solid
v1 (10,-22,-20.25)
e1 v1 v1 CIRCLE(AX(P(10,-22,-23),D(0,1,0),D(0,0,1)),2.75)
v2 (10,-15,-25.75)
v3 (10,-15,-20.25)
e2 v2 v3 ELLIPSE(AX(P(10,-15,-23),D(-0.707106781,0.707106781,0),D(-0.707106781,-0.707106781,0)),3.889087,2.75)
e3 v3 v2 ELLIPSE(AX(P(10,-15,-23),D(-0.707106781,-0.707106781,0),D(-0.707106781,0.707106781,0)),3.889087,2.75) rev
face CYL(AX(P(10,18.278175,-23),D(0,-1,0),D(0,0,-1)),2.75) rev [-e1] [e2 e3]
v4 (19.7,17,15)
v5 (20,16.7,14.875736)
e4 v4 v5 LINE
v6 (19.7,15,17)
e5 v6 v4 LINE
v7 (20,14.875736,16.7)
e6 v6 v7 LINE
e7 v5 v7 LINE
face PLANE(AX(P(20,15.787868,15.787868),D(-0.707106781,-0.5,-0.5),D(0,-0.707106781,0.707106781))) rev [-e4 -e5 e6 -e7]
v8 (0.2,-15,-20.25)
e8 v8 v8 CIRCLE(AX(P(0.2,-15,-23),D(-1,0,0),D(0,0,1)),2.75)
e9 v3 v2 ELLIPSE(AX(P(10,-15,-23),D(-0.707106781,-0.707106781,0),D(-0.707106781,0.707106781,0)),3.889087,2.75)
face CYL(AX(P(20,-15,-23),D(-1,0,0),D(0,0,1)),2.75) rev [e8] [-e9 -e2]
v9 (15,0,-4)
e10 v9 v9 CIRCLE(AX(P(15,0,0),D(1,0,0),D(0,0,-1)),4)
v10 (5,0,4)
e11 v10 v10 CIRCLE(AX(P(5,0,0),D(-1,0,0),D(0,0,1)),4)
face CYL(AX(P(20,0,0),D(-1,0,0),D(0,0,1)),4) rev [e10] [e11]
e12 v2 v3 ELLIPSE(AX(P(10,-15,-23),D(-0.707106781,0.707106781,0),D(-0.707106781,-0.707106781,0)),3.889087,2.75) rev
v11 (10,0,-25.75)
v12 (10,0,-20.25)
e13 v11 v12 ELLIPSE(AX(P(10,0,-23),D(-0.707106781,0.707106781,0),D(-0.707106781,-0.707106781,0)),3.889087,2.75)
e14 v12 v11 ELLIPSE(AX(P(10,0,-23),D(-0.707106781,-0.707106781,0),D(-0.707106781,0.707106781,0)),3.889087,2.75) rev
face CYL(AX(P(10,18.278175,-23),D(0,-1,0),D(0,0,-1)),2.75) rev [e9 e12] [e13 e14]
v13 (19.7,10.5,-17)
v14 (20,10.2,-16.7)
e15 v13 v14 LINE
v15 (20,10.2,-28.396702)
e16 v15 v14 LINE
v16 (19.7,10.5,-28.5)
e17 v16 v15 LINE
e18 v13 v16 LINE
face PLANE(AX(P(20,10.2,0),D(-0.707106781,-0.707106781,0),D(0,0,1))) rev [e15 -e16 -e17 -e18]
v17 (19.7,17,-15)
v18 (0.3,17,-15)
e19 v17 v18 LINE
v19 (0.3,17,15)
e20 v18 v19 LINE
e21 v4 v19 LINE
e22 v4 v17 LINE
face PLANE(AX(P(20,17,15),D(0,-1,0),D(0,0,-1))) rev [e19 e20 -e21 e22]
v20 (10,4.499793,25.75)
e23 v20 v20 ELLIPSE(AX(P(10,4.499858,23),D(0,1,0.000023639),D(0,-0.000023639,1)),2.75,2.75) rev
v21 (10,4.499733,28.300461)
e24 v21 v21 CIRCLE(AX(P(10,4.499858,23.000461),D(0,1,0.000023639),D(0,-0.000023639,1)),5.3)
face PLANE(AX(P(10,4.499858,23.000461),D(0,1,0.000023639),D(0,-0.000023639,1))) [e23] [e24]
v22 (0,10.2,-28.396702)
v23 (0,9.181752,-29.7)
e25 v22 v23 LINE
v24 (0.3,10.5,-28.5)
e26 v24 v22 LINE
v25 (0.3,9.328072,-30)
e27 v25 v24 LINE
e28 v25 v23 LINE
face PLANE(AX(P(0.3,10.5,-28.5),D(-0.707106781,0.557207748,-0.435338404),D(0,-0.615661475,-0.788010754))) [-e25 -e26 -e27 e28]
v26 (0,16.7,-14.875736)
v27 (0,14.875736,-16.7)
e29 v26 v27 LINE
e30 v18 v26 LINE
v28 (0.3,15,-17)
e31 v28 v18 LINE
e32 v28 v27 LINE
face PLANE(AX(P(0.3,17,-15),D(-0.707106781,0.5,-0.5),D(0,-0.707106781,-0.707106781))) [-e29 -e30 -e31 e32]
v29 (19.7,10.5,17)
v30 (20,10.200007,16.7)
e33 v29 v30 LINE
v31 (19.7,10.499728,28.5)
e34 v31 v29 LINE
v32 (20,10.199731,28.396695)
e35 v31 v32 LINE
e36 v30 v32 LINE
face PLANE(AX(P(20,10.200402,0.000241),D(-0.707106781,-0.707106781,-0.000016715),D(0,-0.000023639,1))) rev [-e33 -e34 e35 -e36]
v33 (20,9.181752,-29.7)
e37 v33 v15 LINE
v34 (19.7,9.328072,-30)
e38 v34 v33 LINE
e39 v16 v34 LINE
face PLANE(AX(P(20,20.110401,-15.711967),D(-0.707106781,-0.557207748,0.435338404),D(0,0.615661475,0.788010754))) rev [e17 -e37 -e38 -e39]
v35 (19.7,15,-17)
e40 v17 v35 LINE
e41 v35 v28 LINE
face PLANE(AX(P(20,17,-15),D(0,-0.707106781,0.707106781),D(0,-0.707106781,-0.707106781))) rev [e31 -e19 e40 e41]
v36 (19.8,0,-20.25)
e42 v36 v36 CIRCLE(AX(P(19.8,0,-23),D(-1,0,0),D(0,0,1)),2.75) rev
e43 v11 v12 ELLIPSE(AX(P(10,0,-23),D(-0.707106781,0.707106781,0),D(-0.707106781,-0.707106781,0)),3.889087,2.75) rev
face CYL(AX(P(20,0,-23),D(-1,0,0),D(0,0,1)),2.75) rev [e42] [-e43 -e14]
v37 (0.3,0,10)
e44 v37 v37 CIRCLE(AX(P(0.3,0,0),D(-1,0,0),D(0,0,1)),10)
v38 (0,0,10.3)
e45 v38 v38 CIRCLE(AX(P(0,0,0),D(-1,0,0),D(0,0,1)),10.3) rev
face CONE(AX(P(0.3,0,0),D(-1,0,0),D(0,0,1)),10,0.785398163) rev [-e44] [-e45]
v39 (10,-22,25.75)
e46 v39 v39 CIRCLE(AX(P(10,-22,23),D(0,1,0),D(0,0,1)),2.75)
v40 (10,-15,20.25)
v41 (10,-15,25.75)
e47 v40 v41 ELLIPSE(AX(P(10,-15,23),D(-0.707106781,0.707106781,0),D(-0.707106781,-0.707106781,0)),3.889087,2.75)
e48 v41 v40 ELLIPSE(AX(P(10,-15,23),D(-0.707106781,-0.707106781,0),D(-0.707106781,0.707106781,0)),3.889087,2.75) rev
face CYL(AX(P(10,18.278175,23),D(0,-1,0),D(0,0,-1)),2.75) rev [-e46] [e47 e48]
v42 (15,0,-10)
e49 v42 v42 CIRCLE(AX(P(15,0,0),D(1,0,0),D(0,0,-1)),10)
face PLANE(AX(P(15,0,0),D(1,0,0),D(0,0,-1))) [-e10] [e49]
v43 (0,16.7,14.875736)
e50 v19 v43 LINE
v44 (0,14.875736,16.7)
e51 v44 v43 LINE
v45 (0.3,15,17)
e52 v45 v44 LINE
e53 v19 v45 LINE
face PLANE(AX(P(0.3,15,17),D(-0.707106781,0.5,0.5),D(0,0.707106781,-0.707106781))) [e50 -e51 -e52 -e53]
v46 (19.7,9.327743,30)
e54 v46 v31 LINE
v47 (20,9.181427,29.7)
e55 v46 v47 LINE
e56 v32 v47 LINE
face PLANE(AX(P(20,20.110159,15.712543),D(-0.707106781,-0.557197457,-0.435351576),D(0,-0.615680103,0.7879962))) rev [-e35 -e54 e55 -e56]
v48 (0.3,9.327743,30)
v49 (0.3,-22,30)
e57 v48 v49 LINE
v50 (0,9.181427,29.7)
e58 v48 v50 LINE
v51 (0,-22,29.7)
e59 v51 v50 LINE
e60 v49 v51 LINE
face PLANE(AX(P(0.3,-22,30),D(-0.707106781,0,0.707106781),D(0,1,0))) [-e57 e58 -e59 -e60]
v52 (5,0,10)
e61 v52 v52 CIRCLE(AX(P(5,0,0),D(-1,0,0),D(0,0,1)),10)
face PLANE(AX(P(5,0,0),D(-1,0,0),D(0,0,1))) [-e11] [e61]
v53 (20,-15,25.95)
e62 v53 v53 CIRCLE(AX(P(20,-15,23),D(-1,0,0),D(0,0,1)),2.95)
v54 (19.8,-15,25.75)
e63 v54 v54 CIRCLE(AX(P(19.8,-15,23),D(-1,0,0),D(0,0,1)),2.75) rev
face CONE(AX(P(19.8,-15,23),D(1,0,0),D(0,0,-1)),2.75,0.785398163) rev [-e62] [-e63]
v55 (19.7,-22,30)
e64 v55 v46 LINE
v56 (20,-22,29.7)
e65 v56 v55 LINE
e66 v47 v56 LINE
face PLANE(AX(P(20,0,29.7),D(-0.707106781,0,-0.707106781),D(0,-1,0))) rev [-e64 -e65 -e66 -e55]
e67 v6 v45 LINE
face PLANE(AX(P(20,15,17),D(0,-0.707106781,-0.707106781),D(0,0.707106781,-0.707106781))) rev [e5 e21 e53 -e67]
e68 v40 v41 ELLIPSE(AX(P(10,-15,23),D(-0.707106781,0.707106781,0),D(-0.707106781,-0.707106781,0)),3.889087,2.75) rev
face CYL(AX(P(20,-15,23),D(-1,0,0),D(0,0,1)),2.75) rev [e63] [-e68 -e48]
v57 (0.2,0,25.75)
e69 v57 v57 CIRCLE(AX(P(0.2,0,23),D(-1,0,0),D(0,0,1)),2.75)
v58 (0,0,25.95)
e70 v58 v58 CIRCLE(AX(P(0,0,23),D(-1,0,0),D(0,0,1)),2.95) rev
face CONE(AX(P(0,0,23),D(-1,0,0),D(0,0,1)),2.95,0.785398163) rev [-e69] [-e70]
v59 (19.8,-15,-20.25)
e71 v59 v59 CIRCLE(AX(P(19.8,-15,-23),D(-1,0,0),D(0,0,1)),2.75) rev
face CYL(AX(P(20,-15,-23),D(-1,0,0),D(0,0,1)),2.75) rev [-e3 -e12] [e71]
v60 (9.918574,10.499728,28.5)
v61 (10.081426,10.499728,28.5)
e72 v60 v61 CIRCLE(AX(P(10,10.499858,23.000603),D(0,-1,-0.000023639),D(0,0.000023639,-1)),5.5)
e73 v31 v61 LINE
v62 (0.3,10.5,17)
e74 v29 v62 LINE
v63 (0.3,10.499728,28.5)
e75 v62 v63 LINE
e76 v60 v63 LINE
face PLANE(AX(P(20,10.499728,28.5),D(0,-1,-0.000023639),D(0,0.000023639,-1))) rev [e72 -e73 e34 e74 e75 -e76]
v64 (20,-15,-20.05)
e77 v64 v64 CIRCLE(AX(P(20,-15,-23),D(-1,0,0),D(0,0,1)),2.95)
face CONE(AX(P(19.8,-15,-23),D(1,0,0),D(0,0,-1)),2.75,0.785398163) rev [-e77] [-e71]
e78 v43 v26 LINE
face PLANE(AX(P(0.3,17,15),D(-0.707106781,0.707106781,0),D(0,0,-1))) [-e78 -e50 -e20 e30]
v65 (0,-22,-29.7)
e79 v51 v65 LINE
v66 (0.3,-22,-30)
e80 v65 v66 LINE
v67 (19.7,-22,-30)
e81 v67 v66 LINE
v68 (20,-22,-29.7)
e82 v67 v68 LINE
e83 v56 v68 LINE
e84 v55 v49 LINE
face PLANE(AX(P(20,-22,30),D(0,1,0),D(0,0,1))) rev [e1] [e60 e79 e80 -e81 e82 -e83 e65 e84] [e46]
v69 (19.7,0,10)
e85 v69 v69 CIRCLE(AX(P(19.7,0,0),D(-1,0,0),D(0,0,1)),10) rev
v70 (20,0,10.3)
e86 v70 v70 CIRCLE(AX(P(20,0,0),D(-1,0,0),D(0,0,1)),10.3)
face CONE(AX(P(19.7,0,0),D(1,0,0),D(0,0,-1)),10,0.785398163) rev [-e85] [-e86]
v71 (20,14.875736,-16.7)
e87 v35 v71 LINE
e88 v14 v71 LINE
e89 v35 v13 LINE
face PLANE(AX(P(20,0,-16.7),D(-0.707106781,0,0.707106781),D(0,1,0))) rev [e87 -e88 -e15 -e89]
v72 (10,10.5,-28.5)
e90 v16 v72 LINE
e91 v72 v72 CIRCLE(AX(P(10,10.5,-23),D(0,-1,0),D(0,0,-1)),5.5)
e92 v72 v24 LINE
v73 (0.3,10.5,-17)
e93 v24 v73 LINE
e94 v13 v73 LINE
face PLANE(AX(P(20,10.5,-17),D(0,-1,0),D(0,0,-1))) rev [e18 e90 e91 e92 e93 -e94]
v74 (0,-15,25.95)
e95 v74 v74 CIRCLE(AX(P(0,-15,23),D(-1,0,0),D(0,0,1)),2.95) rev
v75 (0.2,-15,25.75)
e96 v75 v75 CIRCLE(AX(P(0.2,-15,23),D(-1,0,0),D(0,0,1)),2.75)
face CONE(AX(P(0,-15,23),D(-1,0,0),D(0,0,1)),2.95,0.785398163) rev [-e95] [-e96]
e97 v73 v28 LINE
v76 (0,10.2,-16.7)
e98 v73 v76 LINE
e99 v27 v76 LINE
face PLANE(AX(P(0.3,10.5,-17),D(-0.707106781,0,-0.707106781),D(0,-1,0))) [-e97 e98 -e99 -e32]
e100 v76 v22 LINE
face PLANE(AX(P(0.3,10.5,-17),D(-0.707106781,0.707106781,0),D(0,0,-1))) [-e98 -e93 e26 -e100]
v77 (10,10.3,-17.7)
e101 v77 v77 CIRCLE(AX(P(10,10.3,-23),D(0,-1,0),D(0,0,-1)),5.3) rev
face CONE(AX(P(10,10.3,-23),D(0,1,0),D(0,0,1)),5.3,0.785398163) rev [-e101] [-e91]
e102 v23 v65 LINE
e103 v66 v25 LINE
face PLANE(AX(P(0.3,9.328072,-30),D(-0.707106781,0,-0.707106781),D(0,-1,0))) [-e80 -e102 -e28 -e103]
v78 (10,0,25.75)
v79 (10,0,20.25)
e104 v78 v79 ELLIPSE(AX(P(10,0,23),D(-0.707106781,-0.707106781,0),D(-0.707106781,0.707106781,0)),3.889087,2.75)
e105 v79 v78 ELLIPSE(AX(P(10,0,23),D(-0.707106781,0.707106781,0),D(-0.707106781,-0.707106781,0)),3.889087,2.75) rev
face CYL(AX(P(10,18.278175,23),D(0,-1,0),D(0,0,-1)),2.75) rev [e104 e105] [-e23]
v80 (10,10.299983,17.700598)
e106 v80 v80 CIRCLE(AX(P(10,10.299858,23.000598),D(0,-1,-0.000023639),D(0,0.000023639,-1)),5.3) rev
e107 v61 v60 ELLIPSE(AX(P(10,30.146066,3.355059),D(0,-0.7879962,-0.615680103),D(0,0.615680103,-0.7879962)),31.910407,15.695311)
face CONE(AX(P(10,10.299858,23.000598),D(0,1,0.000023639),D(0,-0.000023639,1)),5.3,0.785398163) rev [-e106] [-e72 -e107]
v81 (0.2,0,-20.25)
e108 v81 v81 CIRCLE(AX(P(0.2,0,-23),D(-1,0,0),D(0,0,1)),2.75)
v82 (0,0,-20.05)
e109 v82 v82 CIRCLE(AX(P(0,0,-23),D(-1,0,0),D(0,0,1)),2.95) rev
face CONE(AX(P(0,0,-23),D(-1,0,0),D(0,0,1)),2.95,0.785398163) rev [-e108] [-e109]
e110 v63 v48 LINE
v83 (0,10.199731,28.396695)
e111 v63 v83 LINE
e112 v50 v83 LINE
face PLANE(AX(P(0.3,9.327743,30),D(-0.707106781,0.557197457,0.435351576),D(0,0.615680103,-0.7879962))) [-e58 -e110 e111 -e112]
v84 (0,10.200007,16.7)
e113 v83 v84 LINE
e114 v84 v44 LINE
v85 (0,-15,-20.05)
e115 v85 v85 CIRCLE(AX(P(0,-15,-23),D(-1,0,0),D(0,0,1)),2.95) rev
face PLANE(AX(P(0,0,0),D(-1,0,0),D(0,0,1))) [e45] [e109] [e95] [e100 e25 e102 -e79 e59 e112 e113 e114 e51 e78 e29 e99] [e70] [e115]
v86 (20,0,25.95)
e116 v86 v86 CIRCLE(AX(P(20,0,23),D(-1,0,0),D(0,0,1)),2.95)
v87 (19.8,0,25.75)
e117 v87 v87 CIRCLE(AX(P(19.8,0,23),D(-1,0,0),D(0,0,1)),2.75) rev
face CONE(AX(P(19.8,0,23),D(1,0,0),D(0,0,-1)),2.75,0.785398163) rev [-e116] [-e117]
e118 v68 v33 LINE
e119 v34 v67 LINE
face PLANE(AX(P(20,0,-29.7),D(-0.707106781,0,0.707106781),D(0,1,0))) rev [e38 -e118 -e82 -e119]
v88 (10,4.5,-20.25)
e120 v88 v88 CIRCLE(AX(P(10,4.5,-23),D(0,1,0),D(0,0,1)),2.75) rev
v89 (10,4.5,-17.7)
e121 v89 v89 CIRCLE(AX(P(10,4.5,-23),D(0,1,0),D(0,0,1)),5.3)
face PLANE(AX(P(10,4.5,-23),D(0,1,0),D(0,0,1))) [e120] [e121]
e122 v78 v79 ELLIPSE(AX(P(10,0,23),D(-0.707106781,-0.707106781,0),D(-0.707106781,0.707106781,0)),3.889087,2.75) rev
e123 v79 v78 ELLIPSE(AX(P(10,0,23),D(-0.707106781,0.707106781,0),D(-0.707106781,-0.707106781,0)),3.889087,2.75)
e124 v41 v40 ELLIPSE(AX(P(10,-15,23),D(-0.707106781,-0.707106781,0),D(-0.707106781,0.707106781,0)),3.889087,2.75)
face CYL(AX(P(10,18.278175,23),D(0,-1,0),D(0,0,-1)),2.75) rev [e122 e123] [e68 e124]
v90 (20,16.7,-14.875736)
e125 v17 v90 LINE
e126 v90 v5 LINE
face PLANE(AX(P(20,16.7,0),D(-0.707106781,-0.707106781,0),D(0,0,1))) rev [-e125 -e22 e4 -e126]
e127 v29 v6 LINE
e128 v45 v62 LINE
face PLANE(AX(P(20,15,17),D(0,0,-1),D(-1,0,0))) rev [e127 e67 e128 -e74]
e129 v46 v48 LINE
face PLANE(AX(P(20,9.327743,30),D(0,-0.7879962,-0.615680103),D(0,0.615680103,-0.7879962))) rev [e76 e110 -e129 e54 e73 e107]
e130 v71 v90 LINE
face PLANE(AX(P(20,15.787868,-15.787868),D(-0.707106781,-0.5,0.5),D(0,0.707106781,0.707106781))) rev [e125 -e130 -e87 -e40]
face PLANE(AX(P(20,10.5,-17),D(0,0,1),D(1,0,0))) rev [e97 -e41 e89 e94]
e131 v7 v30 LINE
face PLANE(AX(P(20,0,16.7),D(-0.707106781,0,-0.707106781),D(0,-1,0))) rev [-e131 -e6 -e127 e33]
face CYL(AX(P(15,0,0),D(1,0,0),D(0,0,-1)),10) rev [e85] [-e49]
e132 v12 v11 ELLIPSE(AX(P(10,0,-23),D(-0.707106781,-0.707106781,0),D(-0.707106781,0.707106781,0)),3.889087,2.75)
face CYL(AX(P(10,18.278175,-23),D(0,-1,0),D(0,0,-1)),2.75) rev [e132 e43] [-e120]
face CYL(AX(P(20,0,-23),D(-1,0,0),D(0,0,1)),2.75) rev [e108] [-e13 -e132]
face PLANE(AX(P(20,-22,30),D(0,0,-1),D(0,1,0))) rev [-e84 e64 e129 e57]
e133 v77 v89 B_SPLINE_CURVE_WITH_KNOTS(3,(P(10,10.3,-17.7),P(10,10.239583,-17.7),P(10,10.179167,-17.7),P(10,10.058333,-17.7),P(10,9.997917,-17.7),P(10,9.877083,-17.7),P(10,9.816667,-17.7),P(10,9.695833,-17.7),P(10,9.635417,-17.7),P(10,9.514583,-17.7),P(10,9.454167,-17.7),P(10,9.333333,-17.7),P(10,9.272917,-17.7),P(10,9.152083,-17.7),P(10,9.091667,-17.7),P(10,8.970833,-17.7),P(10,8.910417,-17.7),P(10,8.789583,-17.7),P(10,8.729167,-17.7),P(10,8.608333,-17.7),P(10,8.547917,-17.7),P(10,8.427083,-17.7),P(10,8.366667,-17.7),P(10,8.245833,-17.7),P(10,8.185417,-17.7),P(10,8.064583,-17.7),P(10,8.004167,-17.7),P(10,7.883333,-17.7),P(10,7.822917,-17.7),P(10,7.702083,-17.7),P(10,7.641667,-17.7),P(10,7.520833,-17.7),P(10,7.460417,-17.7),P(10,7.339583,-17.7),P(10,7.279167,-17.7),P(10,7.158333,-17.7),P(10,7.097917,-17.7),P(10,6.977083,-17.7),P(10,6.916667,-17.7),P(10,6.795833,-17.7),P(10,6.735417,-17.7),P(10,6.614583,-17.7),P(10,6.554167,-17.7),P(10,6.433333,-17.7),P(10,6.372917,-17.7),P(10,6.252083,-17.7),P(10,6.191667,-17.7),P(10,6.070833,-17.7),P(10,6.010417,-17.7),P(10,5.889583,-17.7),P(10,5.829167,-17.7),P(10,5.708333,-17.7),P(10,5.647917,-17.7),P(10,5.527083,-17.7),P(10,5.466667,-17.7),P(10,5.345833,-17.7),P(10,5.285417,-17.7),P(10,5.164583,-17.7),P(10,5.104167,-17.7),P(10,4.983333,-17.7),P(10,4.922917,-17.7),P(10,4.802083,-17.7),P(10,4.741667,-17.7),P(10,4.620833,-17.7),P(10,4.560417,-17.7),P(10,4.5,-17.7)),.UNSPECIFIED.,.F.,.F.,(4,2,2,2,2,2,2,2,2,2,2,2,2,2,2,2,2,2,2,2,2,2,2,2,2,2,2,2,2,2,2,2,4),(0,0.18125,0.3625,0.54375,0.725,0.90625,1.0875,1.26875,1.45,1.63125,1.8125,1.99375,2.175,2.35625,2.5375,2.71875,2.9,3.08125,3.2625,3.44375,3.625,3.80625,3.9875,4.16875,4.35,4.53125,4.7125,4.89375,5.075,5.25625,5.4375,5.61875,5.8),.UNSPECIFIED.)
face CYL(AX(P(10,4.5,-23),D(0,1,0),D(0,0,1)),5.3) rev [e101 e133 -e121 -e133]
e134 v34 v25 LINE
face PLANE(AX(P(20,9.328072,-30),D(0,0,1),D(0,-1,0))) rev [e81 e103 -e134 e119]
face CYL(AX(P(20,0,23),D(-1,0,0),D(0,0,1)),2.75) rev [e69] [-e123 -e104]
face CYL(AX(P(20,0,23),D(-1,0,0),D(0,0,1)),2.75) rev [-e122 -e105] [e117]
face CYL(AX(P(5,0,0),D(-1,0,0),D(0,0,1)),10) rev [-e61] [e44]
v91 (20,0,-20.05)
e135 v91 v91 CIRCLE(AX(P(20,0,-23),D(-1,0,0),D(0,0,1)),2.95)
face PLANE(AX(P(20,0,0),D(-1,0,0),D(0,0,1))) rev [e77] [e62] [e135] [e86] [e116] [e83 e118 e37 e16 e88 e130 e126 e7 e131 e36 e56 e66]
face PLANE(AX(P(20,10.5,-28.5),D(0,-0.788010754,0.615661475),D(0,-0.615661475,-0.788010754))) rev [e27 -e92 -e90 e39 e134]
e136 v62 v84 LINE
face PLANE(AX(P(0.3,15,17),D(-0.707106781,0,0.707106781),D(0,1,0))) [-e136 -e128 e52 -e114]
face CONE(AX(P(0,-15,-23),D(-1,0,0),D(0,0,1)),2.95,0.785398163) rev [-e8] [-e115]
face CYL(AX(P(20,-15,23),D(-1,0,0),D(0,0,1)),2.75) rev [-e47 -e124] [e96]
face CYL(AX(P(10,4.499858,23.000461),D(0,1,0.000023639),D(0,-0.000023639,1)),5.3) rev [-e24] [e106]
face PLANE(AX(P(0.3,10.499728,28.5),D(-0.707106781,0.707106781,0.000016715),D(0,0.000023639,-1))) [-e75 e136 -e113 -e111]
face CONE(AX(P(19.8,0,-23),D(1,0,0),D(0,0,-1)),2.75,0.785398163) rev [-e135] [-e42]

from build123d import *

# Parameters (mm, degrees)
SKETCH1_R                      = 4
SKETCH1_R_2                    = 2.75
BOSS_EXTRUDE1_DEPTH            = 20
SKETCH2_R                      = 10
CUT_EXTRUDE1_DEPTH             = 5
CUT_EXTRUDE2_START             = -5
SKETCH3_R                      = 10
CUT_EXTRUDE2_DEPTH             = 5
CHAMFER2_SIZE                  = 0.2
CHAMFER3_SIZE                  = 0.2
CHAMFER4_SIZE                  = 0.2
CUT_EXTRUDE4_REACH             = 55.113
SKETCH4_R                      = 2.75
CUT_EXTRUDE4_DIRECTION_2_DEPTH = 54.1130869
SKETCH5_R                      = 5.3
CUT_EXTRUDE6_DEPTH             = 6
SKETCH6_R                      = 5.3
CUT_EXTRUDE7_DEPTH             = 6
CHAMFER6_SIZE                  = 0.2
CHAMFER7_SIZE                  = 0.2
CHAMFER11_SIZE                 = 0.3
CHAMFER12_SIZE                 = 0.3


# Some blends are built 0.0001 mm under size
with BuildPart() as part:
    # Sketch1 → Boss-Extrude1 (new body)
    with BuildSketch(Plane(origin=(0, 0, 0), x_dir=(0, 0, -1), z_dir=(1, 0, 0))):
        Polygon((-30, -22), (30, -22), (30, 9.32807156), (28.5, 10.5), (17, 10.5), (17, 15), (15, 17), (-15, 17), (-17, 15), (-17, 10.5), (-28.5, 10.499728155), (-30, 9.327742612), align=None)
        Circle(SKETCH1_R, mode=Mode.SUBTRACT)
        with Locations((-23, 0)):
            Circle(SKETCH1_R_2, mode=Mode.SUBTRACT)
        with Locations((23, 0)):
            Circle(SKETCH1_R_2, mode=Mode.SUBTRACT)
        with Locations((23, -15)):
            Circle(SKETCH1_R_2, mode=Mode.SUBTRACT)
        with Locations((-23, -15)):
            Circle(SKETCH1_R_2, mode=Mode.SUBTRACT)
    extrude(amount=BOSS_EXTRUDE1_DEPTH)

    # Sketch2 → Cut-Extrude1 (cut)
    with BuildSketch(Plane.ZY):
        Circle(SKETCH2_R)
    extrude(amount=-CUT_EXTRUDE1_DEPTH, mode=Mode.SUBTRACT)

    # Sketch3 → Cut-Extrude2 (cut)
    with BuildSketch(Plane(origin=(20, 0, 0), x_dir=(0, 0, -1), z_dir=(1, 0, 0)).offset(CUT_EXTRUDE2_START)):
        with Locations(Location((0, 0, 0), (0, 0, 180))):
            Circle(SKETCH3_R)
    extrude(amount=CUT_EXTRUDE2_DEPTH, mode=Mode.SUBTRACT)

    # Chamfer2
    chamfer2_edges = [part.edges().sort_by_distance(p)[0] for p in [
        (0, 0, -20.25),
    ]]
    chamfer(chamfer2_edges, length=CHAMFER2_SIZE)

    # Chamfer3
    chamfer3_edges = [part.edges().sort_by_distance(p)[0] for p in [
        (0, 0, 25.75),
        (0, -15, -20.25),
        (0, -15, 25.75),
    ]]
    chamfer(chamfer3_edges, length=CHAMFER3_SIZE)

    # Chamfer4
    chamfer4_edges = [part.edges().sort_by_distance(p)[0] for p in [
        (20, 0, -20.25),
        (20, 0, 25.75),
        (20, -15, -20.25),
        (20, -15, 25.75),
    ]]
    chamfer(chamfer4_edges, length=CHAMFER4_SIZE)

    # Cut-Extrude4: up to this face of the body (flat: up to its plane)
    cut_extrude4_end = Plane(part.part.faces().sort_by_distance((10, 10.5, -22.75))[0])
    # Sketch4 → Cut-Extrude4 (cut, up to the picked face)
    with BuildSketch(Plane.XZ.offset(22), mode=Mode.PRIVATE) as cut_extrude4_sk1:
        with Locations(Location((10, 23, 0), (0, 0, 270))):
            Circle(SKETCH4_R)
    cut_extrude4_tool1 = split(extrude(cut_extrude4_sk1.sketch, amount=-CUT_EXTRUDE4_REACH, mode=Mode.PRIVATE), bisect_by=cut_extrude4_end, keep=Keep.BOTH, mode=Mode.PRIVATE)
    # Sketch4 → Cut-Extrude4 (cut, up to the picked face)
    with BuildSketch(Plane.XZ.offset(22), mode=Mode.PRIVATE) as cut_extrude4_sk2:
        with Locations(Location((10, -23, 0), (0, 0, 270))):
            Circle(SKETCH4_R)
    cut_extrude4_tool2 = split(extrude(cut_extrude4_sk2.sketch, amount=-CUT_EXTRUDE4_REACH, mode=Mode.PRIVATE), bisect_by=cut_extrude4_end, keep=Keep.BOTH, mode=Mode.PRIVATE)
    add(cut_extrude4_tool1.solids().sort_by(Axis((10, -22, 23), (0, 1, 0)))[0], mode=Mode.SUBTRACT)
    add(cut_extrude4_tool2.solids().sort_by(Axis((10, -22, -23), (0, 1, 0)))[0], mode=Mode.SUBTRACT)

    # Sketch4 → Cut-Extrude4 direction 2 (cut)
    with BuildSketch(Plane.XZ.offset(22)):
        with Locations(Location((10, 23, 0), (0, 0, 270))):
            Circle(SKETCH4_R)
        with Locations(Location((10, -23, 0), (0, 0, 270))):
            Circle(SKETCH4_R)
    extrude(amount=CUT_EXTRUDE4_DIRECTION_2_DEPTH, mode=Mode.SUBTRACT)

    # Sketch5 → Cut-Extrude6 (cut)
    with BuildSketch(Plane(origin=(0, 10.5, 0), x_dir=(1, 0, 0), z_dir=(0, 1, 0))):
        with Locations(Location((10, 23, 0), (0, 0, 270))):
            Circle(SKETCH5_R)
    extrude(amount=-CUT_EXTRUDE6_DEPTH, mode=Mode.SUBTRACT)

    # Sketch6 → Cut-Extrude7 (cut)
    with BuildSketch(Plane(origin=(0, 10.500401852, 0.000248216), x_dir=(1, 0, 0), z_dir=(0, 0.9999999997206055, 2.3638723279467724e-05))):
        with Locations(Location((10, -23.000354574, 0), (0, 0, 270))):
            Circle(SKETCH6_R)
    extrude(amount=-CUT_EXTRUDE7_DEPTH, mode=Mode.SUBTRACT)

    # Chamfer6
    # the kernel refuses this chamfer: 0.2 mm, written as the material it takes off along each edge
    with BuildSketch(Plane(origin=(10, 10.499858153, 23.000602784), x_dir=(0, -2.363872327936284e-05, 0.9999999997206054), z_dir=(-1, 0, 0))) as chamfer6_piece_1:
        Polygon((5.3 + CHAMFER6_SIZE, 0), (5.3, -CHAMFER6_SIZE), (5.3, 0), align=None)
    revolve(axis=Axis((10, 10.499858153, 23.000602784), (0, 0.9999999997206055, 2.3638723279467724e-05)), mode=Mode.SUBTRACT)

    # Chamfer7
    chamfer7_edges = [part.edges().sort_by_distance(p)[0] for p in [
        (10, 10.5, -28.3),
    ]]
    chamfer(chamfer7_edges, length=CHAMFER7_SIZE - 0.0001)  # a hair under: the kernel refuses the full size

    # Chamfer11
    chamfer11_edges = [part.edges().sort_by_distance(p)[0] for p in [
        (20, -6.336128694, 30),
        (20, -6.33596422, -30),
        (20, 9.91403578, -29.25),
        (20, 10.5, -22.75),
        (20, 12.75, -17),
        (20, 16, -16),
        (20, 17, 0),
        (20, 16, 16),
        (20, 12.75, 17),
        (20, 10.499864077, 22.75),
        (20, 0, -10),
        (20, 9.913735383, 29.25),
    ]]
    chamfer(chamfer11_edges, length=CHAMFER11_SIZE)

    # Chamfer12
    chamfer12_edges = [part.edges().sort_by_distance(p)[0] for p in [
        (0, 12.75, 17),
        (0, 16, 16),
        (0, 17, 0),
        (0, 16, -16),
        (0, 12.75, -17),
        (0, 10.5, -22.75),
        (0, 9.91403578, -29.25),
        (0, -6.33596422, -30),
        (0, -6.336128694, 30),
        (0, 9.913735383, 29.25),
        (0, 10.499864077, 22.75),
        (0, 0, -10),
    ]]
    chamfer(chamfer12_edges, length=CHAMFER12_SIZE)


solid = part.part
